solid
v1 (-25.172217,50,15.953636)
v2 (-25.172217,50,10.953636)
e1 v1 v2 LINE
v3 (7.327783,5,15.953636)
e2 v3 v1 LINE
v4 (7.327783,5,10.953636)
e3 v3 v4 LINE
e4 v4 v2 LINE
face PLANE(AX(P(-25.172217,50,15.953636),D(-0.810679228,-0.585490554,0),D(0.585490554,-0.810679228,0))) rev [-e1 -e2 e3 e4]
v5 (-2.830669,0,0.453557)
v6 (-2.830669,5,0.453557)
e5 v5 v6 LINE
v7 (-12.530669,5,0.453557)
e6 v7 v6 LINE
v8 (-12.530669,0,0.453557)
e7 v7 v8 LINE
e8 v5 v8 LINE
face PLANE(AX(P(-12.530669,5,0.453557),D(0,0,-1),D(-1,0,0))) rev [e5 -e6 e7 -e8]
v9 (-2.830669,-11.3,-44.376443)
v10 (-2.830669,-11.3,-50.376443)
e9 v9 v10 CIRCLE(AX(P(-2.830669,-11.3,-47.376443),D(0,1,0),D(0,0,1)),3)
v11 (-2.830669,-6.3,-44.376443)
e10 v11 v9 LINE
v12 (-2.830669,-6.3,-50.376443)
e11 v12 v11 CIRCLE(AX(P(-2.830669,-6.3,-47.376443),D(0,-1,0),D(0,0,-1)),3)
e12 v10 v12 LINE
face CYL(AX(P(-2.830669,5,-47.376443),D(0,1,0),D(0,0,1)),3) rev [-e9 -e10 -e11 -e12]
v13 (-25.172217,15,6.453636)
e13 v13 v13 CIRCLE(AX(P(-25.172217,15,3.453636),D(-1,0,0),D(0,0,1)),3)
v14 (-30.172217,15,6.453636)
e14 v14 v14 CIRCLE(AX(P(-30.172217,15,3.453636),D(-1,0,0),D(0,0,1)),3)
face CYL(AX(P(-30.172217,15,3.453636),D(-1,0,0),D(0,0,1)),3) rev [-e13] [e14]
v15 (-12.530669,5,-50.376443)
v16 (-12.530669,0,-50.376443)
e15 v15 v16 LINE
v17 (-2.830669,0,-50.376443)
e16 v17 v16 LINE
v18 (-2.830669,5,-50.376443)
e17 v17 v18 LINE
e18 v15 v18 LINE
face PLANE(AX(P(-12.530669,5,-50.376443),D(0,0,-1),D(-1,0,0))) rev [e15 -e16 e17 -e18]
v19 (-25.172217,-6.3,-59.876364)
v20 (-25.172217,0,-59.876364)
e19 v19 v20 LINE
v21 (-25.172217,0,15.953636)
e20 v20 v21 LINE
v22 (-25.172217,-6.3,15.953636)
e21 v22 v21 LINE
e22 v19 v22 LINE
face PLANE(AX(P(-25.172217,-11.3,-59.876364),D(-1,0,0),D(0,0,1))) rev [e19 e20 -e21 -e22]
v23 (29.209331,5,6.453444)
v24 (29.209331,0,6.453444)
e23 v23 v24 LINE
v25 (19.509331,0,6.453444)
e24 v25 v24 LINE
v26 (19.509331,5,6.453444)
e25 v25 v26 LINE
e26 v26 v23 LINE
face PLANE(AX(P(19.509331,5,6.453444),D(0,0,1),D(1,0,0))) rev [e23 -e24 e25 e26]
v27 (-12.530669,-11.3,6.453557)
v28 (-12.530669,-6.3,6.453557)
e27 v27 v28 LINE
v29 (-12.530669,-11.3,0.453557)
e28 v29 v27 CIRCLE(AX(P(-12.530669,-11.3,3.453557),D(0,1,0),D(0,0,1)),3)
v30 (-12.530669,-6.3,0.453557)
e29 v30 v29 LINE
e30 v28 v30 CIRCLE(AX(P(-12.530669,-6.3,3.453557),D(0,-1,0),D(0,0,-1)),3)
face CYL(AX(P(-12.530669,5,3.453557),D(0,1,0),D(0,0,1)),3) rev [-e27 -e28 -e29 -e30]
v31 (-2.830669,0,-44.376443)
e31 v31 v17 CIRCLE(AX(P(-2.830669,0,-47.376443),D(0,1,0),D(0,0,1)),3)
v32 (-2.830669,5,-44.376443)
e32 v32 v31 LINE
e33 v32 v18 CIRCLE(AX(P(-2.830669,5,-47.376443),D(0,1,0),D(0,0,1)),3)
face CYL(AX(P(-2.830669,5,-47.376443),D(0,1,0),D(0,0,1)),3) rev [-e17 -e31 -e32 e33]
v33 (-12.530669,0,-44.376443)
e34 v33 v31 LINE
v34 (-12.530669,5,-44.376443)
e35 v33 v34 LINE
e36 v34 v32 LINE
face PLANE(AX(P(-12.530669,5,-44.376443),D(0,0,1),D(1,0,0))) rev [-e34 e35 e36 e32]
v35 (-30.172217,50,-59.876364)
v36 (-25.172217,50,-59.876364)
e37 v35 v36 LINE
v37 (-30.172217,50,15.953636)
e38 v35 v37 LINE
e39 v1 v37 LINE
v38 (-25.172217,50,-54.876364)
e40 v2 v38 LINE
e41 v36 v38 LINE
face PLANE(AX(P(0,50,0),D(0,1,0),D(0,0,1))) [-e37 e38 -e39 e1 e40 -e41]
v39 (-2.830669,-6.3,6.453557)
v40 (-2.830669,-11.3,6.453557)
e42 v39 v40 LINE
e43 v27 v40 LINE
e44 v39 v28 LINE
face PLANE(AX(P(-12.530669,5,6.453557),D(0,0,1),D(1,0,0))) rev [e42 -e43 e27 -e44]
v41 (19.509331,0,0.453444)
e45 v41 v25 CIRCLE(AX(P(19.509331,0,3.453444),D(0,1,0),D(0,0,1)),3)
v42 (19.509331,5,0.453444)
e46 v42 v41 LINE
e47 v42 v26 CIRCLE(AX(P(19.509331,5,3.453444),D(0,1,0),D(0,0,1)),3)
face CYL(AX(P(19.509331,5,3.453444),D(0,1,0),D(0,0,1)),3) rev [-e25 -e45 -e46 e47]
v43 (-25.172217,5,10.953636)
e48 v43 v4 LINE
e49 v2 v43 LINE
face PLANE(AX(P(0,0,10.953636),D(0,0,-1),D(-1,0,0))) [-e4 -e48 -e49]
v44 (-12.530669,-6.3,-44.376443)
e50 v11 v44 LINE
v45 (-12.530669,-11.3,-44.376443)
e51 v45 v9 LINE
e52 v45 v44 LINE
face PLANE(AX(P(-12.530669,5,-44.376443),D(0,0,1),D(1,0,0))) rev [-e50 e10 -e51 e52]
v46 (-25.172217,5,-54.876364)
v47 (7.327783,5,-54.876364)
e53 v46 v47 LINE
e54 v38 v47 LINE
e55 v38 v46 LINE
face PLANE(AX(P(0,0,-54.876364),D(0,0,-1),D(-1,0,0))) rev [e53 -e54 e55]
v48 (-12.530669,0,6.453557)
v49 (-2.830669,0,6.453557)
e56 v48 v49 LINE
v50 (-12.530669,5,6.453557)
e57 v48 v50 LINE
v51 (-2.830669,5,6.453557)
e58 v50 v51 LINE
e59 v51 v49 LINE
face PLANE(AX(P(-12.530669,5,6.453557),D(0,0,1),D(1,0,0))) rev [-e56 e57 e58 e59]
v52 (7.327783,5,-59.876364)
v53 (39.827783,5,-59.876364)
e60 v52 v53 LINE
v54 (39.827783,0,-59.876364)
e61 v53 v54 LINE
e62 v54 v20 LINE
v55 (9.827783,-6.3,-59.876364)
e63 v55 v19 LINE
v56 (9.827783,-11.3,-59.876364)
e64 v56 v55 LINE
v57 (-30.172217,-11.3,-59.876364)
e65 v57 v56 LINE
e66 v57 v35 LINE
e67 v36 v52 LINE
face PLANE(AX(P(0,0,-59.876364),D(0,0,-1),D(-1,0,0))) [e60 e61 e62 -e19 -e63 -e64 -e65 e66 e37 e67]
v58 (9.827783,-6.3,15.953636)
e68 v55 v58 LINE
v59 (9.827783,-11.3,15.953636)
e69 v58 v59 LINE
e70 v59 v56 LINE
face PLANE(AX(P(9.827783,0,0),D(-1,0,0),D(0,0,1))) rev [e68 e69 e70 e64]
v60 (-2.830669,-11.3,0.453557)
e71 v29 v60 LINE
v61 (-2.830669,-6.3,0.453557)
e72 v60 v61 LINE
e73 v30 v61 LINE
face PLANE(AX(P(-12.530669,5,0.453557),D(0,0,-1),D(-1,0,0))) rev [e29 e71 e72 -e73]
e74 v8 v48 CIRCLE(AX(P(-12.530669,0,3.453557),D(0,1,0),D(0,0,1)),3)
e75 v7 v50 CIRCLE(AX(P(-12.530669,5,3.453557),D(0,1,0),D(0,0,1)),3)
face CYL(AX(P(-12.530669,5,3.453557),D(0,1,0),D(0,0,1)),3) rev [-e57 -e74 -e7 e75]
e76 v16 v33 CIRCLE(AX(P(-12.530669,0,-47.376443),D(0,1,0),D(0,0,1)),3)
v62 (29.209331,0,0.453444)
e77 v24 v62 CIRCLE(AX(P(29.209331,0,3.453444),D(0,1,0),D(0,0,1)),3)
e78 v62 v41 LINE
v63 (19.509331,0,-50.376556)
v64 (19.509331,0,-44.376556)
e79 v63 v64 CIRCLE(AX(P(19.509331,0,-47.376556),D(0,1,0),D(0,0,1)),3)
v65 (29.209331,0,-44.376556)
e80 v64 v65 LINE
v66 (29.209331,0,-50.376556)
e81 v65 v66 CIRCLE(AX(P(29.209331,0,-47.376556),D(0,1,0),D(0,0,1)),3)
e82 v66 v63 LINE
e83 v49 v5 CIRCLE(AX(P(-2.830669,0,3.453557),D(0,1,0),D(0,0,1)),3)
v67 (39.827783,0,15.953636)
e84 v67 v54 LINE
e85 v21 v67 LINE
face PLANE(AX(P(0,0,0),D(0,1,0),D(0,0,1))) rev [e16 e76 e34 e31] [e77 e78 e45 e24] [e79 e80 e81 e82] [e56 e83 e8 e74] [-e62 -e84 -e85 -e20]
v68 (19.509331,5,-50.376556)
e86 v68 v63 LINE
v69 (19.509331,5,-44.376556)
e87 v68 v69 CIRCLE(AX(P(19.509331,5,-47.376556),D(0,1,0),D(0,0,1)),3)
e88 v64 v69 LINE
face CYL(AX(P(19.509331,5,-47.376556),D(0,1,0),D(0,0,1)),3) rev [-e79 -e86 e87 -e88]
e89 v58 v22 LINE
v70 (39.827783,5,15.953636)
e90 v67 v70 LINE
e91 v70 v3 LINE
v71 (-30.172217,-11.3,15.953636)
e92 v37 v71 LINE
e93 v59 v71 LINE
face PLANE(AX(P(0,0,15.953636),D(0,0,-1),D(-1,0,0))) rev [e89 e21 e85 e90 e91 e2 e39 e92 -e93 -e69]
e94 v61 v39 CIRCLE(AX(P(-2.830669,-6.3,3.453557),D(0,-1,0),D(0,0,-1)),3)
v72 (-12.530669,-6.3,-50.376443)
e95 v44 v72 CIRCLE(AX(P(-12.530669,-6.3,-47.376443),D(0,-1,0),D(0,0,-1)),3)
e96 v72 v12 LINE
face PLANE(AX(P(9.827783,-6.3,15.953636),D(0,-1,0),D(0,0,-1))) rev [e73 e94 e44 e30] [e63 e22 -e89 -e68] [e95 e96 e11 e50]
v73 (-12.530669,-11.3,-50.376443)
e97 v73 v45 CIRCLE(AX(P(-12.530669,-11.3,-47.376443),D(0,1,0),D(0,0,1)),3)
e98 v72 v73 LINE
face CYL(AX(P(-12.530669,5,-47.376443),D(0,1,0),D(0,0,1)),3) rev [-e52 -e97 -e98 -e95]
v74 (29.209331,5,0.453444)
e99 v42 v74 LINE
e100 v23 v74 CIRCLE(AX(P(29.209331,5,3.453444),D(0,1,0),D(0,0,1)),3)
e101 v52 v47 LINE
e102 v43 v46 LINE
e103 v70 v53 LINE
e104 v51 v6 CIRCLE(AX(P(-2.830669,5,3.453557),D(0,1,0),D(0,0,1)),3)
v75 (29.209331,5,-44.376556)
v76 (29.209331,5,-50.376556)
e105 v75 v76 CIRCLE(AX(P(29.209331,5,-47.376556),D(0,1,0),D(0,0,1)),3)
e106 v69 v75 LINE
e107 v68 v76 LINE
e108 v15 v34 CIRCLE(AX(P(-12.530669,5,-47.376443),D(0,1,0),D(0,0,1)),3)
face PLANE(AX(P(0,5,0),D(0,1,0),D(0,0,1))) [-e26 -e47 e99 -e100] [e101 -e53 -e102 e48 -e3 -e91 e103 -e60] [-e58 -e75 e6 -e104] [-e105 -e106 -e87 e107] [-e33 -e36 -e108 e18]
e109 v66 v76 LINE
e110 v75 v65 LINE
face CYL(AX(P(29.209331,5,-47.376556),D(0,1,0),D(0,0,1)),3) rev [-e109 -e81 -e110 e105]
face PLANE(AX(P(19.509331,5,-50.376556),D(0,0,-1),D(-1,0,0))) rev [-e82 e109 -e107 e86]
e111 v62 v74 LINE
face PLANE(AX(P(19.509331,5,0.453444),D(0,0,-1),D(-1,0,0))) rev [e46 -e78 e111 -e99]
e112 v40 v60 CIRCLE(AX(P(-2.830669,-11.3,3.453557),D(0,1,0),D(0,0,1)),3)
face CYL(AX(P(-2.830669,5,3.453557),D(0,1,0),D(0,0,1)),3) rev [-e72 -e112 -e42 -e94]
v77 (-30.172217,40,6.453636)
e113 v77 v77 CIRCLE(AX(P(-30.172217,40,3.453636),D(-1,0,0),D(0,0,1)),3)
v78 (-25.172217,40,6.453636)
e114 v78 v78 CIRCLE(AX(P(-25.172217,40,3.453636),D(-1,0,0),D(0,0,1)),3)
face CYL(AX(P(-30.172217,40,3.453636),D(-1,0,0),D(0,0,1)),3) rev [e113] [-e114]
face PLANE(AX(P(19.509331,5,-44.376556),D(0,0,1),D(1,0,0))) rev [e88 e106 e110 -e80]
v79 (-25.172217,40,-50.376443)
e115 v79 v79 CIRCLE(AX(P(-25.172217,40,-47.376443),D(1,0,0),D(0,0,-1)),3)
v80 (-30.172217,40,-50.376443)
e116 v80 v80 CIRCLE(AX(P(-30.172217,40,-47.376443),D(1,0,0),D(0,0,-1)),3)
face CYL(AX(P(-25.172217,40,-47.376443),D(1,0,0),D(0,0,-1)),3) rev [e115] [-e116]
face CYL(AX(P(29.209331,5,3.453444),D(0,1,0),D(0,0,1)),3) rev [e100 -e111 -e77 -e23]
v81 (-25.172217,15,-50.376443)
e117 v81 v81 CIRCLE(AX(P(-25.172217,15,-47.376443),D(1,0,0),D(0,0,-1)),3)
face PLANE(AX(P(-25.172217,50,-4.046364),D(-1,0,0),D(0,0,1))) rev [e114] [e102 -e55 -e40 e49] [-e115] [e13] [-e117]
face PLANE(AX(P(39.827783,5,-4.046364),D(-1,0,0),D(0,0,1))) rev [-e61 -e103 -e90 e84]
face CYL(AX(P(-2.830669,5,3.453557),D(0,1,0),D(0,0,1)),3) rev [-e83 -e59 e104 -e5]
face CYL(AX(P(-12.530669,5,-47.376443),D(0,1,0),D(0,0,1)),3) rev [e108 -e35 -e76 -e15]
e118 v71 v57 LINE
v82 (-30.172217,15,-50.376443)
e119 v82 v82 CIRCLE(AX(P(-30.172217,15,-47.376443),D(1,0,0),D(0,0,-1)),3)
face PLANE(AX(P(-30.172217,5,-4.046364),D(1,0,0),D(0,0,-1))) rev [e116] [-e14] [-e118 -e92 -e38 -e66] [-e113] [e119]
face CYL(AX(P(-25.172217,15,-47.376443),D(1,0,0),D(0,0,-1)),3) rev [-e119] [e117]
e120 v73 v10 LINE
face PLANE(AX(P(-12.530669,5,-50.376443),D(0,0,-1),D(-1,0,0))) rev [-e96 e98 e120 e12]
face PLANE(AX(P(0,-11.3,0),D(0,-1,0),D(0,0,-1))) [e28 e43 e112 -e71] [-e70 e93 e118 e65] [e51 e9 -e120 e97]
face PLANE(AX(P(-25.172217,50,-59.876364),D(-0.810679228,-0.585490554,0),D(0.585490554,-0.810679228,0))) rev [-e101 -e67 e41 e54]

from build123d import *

# Parameters (mm, degrees)
SKETCH1_W                 = 70
SKETCH1_H                 = 15
BOSS_EXTRUDE1_DEPTH       = 5
SKETCH3_W                 = 5
SKETCH3_H                 = 15
BOSS_EXTRUDE2_DEPTH       = 45
F_6_0MM_DOWEL_HOLE1_D     = 6
F_6_0MM_DOWEL_SLOT1_DEPTH = 5
BOSS_EXTRUDE3_DEPTH       = 50.83
F_6_0MM_DOWEL_SLOT2_DEPTH = 5
F_6_0MM_DOWEL_HOLE2_D     = 6
F_6_0MM_DOWEL_HOLE2_DEPTH = 7.999
F_6_0MM_DOWEL_HOLE2_TIP   = 1.802581857
BOSS_EXTRUDE4_DEPTH       = 5
BOSS_EXTRUDE5_DEPTH       = 5
SKETCH19_W                = 5
SKETCH19_H                = 75.83
BOSS_EXTRUDE6_DEPTH       = 11.3
SKETCH20_W                = 75.83
SKETCH20_H                = 5
BOSS_EXTRUDE7_DEPTH       = 35
F_6_0MM_START             = -11.3
F_6_0MM_DOWEL_SLOT3_DEPTH = 5


# Read off the part's stored shape, not the designer's step: Ø6.0mm Dowel Slot1, Ø6.0mm Dowel Slot2, Ø6.0mm Dowel Slot3
with BuildPart() as part:
    # Sketch1 → Boss-Extrude1 (new body)
    with BuildSketch(Plane(origin=(0, 0, 0), x_dir=(1, 0, 0), z_dir=(0, 1, 0))):
        with Locations((4.827783478, -3.453636176)):
            Rectangle(SKETCH1_W, SKETCH1_H)
    extrude(amount=BOSS_EXTRUDE1_DEPTH)

    # Sketch3 → Boss-Extrude2 (add)
    with BuildSketch(Plane(origin=(0, 5, 0), x_dir=(1, 0, 0), z_dir=(0, 1, 0))):
        with Locations((-27.672216522, -3.453636176)):
            Rectangle(SKETCH3_W, SKETCH3_H)
    extrude(amount=BOSS_EXTRUDE2_DEPTH)

    # Ø6.0mm Dowel Hole1 (through all)
    with Locations(Plane.ZY.offset(30.172216522)):
        with Locations((3.453636176, 15), (3.453636176, 40)):
            Hole(F_6_0MM_DOWEL_HOLE1_D / 2)

    # Ø6.0mm Dowel Slot1 outline → Ø6.0mm Dowel Slot1 (cut)
    with BuildSketch(Plane(origin=(0, 0, 0), x_dir=(1, 0, 0), z_dir=(0, 1, 0))):
        with BuildLine():
            Line((19.509331286, -6.453444287), (29.209331286, -6.453444287))
            ThreePointArc((29.209331286, -6.453444287), (32.209331286, -3.453444287), (29.209331286, -0.453444287))
            Line((29.209331286, -0.453444287), (19.509331286, -0.453444287))
            ThreePointArc((19.509331286, -0.453444287), (16.509331286, -3.453444287), (19.509331286, -6.453444287))
        make_face()
        with BuildLine():
            Line((-12.530668714, -6.453557031), (-2.830668714, -6.453557031))
            ThreePointArc((-2.830668714, -6.453557031), (0.169331286, -3.453557031), (-2.830668714, -0.453557031))
            Line((-2.830668714, -0.453557031), (-12.530668714, -0.453557031))
            ThreePointArc((-12.530668714, -0.453557031), (-15.530668714, -3.453557031), (-12.530668714, -6.453557031))
        make_face()
    extrude(amount=F_6_0MM_DOWEL_SLOT1_DEPTH, mode=Mode.SUBTRACT)

    # Sketch10 → Boss-Extrude3 (add)
    with BuildSketch(Plane(origin=(0, 0, -4.046363824), x_dir=(-1, 0, 0), z_dir=(0, 0, -1))):
        Polygon((-39.827783478, 5), (-39.827783478, 0), (30.172216522, 0), (30.172216522, 50), (25.172216522, 50), (25.172216522, 5), align=None)
    extrude(amount=BOSS_EXTRUDE3_DEPTH)

    # Ø6.0mm Dowel Slot2 outline → Ø6.0mm Dowel Slot2 (cut)
    with BuildSketch(Plane(origin=(0, 0, 0), x_dir=(1, 0, 0), z_dir=(0, 1, 0))):
        with BuildLine():
            Line((19.509331286, 44.376555713), (29.209331286, 44.376555713))
            ThreePointArc((29.209331286, 44.376555713), (32.209331286, 47.376555713), (29.209331286, 50.376555713))
            Line((29.209331286, 50.376555713), (19.509331286, 50.376555713))
            ThreePointArc((19.509331286, 50.376555713), (16.509331286, 47.376555713), (19.509331286, 44.376555713))
        make_face()
        with BuildLine():
            Line((-12.530668714, 44.376442969), (-2.830668714, 44.376442969))
            ThreePointArc((-2.830668714, 44.376442969), (0.169331286, 47.376442969), (-2.830668714, 50.376442969))
            Line((-2.830668714, 50.376442969), (-12.530668714, 50.376442969))
            ThreePointArc((-12.530668714, 50.376442969), (-15.530668714, 47.376442969), (-12.530668714, 44.376442969))
        make_face()
    extrude(amount=F_6_0MM_DOWEL_SLOT2_DEPTH, mode=Mode.SUBTRACT)

    # Ø6.0mm Dowel Hole2
    with Locations(Plane(origin=(-25.172216522, 0, 0), x_dir=(0, 0, -1), z_dir=(1, 0, 0))):
        with Locations((47.376442969, 40), (47.376442969, 15)):
            Hole(F_6_0MM_DOWEL_HOLE2_D / 2, depth=F_6_0MM_DOWEL_HOLE2_DEPTH)
            with Locations((0, 0, -(F_6_0MM_DOWEL_HOLE2_DEPTH + F_6_0MM_DOWEL_HOLE2_TIP / 2))):  # 118° drill point
                Cone(0, F_6_0MM_DOWEL_HOLE2_D / 2, F_6_0MM_DOWEL_HOLE2_TIP, mode=Mode.SUBTRACT)

    # Sketch17 → Boss-Extrude4 (add)
    with BuildSketch(Plane.XY.offset(10.953636176)):
        Polygon((-25.172216522, 50), (7.327783478, 5), (39.827783478, 5), (39.827783478, 0), (7.327783478, 0), (-30.172216522, 0), (-30.172216522, 50), align=None)
    extrude(amount=BOSS_EXTRUDE4_DEPTH)

    # Sketch18 → Boss-Extrude5 (add)
    with BuildSketch(Plane(origin=(0, 0, -54.876363824), x_dir=(-1, 0, 0), z_dir=(0, 0, -1))):
        Polygon((25.172216522, 50), (-7.327783478, 5), (-39.827783478, 5), (-39.827783478, 0), (30.172216522, 0), (30.172216522, 50), align=None)
    extrude(amount=BOSS_EXTRUDE5_DEPTH)

    # Sketch19 → Boss-Extrude6 (add)
    with BuildSketch(Plane.XZ):
        with Locations((-27.672216522, -21.961363824)):
            Rectangle(SKETCH19_W, SKETCH19_H)
    extrude(amount=BOSS_EXTRUDE6_DEPTH)

    # Sketch20 → Boss-Extrude7 (add)
    with BuildSketch(Plane(origin=(-25.172216522, 0, 0), x_dir=(0, 0, -1), z_dir=(1, 0, 0))):
        with Locations((21.961363824, -8.8)):
            Rectangle(SKETCH20_W, SKETCH20_H)
    extrude(amount=BOSS_EXTRUDE7_DEPTH)

    # Ø6.0mm Dowel Slot3 outline → Ø6.0mm Dowel Slot3 (cut)
    with BuildSketch(Plane(origin=(0, 0, 0), x_dir=(1, 0, 0), z_dir=(0, 1, 0)).offset(F_6_0MM_START)):
        with BuildLine():
            Line((-12.530668714, -6.453557031), (-2.830668714, -6.453557031))
            ThreePointArc((-2.830668714, -6.453557031), (0.169331286, -3.453557031), (-2.830668714, -0.453557031))
            Line((-2.830668714, -0.453557031), (-12.530668714, -0.453557031))
            ThreePointArc((-12.530668714, -0.453557031), (-15.530668714, -3.453557031), (-12.530668714, -6.453557031))
        make_face()
        with BuildLine():
            Line((-12.530668714, 44.376442969), (-2.830668714, 44.376442969))
            ThreePointArc((-2.830668714, 44.376442969), (0.169331286, 47.376442969), (-2.830668714, 50.376442969))
            Line((-2.830668714, 50.376442969), (-12.530668714, 50.376442969))
            ThreePointArc((-12.530668714, 50.376442969), (-15.530668714, 47.376442969), (-12.530668714, 44.376442969))
        make_face()
    extrude(amount=F_6_0MM_DOWEL_SLOT3_DEPTH, mode=Mode.SUBTRACT)


solid = part.part
